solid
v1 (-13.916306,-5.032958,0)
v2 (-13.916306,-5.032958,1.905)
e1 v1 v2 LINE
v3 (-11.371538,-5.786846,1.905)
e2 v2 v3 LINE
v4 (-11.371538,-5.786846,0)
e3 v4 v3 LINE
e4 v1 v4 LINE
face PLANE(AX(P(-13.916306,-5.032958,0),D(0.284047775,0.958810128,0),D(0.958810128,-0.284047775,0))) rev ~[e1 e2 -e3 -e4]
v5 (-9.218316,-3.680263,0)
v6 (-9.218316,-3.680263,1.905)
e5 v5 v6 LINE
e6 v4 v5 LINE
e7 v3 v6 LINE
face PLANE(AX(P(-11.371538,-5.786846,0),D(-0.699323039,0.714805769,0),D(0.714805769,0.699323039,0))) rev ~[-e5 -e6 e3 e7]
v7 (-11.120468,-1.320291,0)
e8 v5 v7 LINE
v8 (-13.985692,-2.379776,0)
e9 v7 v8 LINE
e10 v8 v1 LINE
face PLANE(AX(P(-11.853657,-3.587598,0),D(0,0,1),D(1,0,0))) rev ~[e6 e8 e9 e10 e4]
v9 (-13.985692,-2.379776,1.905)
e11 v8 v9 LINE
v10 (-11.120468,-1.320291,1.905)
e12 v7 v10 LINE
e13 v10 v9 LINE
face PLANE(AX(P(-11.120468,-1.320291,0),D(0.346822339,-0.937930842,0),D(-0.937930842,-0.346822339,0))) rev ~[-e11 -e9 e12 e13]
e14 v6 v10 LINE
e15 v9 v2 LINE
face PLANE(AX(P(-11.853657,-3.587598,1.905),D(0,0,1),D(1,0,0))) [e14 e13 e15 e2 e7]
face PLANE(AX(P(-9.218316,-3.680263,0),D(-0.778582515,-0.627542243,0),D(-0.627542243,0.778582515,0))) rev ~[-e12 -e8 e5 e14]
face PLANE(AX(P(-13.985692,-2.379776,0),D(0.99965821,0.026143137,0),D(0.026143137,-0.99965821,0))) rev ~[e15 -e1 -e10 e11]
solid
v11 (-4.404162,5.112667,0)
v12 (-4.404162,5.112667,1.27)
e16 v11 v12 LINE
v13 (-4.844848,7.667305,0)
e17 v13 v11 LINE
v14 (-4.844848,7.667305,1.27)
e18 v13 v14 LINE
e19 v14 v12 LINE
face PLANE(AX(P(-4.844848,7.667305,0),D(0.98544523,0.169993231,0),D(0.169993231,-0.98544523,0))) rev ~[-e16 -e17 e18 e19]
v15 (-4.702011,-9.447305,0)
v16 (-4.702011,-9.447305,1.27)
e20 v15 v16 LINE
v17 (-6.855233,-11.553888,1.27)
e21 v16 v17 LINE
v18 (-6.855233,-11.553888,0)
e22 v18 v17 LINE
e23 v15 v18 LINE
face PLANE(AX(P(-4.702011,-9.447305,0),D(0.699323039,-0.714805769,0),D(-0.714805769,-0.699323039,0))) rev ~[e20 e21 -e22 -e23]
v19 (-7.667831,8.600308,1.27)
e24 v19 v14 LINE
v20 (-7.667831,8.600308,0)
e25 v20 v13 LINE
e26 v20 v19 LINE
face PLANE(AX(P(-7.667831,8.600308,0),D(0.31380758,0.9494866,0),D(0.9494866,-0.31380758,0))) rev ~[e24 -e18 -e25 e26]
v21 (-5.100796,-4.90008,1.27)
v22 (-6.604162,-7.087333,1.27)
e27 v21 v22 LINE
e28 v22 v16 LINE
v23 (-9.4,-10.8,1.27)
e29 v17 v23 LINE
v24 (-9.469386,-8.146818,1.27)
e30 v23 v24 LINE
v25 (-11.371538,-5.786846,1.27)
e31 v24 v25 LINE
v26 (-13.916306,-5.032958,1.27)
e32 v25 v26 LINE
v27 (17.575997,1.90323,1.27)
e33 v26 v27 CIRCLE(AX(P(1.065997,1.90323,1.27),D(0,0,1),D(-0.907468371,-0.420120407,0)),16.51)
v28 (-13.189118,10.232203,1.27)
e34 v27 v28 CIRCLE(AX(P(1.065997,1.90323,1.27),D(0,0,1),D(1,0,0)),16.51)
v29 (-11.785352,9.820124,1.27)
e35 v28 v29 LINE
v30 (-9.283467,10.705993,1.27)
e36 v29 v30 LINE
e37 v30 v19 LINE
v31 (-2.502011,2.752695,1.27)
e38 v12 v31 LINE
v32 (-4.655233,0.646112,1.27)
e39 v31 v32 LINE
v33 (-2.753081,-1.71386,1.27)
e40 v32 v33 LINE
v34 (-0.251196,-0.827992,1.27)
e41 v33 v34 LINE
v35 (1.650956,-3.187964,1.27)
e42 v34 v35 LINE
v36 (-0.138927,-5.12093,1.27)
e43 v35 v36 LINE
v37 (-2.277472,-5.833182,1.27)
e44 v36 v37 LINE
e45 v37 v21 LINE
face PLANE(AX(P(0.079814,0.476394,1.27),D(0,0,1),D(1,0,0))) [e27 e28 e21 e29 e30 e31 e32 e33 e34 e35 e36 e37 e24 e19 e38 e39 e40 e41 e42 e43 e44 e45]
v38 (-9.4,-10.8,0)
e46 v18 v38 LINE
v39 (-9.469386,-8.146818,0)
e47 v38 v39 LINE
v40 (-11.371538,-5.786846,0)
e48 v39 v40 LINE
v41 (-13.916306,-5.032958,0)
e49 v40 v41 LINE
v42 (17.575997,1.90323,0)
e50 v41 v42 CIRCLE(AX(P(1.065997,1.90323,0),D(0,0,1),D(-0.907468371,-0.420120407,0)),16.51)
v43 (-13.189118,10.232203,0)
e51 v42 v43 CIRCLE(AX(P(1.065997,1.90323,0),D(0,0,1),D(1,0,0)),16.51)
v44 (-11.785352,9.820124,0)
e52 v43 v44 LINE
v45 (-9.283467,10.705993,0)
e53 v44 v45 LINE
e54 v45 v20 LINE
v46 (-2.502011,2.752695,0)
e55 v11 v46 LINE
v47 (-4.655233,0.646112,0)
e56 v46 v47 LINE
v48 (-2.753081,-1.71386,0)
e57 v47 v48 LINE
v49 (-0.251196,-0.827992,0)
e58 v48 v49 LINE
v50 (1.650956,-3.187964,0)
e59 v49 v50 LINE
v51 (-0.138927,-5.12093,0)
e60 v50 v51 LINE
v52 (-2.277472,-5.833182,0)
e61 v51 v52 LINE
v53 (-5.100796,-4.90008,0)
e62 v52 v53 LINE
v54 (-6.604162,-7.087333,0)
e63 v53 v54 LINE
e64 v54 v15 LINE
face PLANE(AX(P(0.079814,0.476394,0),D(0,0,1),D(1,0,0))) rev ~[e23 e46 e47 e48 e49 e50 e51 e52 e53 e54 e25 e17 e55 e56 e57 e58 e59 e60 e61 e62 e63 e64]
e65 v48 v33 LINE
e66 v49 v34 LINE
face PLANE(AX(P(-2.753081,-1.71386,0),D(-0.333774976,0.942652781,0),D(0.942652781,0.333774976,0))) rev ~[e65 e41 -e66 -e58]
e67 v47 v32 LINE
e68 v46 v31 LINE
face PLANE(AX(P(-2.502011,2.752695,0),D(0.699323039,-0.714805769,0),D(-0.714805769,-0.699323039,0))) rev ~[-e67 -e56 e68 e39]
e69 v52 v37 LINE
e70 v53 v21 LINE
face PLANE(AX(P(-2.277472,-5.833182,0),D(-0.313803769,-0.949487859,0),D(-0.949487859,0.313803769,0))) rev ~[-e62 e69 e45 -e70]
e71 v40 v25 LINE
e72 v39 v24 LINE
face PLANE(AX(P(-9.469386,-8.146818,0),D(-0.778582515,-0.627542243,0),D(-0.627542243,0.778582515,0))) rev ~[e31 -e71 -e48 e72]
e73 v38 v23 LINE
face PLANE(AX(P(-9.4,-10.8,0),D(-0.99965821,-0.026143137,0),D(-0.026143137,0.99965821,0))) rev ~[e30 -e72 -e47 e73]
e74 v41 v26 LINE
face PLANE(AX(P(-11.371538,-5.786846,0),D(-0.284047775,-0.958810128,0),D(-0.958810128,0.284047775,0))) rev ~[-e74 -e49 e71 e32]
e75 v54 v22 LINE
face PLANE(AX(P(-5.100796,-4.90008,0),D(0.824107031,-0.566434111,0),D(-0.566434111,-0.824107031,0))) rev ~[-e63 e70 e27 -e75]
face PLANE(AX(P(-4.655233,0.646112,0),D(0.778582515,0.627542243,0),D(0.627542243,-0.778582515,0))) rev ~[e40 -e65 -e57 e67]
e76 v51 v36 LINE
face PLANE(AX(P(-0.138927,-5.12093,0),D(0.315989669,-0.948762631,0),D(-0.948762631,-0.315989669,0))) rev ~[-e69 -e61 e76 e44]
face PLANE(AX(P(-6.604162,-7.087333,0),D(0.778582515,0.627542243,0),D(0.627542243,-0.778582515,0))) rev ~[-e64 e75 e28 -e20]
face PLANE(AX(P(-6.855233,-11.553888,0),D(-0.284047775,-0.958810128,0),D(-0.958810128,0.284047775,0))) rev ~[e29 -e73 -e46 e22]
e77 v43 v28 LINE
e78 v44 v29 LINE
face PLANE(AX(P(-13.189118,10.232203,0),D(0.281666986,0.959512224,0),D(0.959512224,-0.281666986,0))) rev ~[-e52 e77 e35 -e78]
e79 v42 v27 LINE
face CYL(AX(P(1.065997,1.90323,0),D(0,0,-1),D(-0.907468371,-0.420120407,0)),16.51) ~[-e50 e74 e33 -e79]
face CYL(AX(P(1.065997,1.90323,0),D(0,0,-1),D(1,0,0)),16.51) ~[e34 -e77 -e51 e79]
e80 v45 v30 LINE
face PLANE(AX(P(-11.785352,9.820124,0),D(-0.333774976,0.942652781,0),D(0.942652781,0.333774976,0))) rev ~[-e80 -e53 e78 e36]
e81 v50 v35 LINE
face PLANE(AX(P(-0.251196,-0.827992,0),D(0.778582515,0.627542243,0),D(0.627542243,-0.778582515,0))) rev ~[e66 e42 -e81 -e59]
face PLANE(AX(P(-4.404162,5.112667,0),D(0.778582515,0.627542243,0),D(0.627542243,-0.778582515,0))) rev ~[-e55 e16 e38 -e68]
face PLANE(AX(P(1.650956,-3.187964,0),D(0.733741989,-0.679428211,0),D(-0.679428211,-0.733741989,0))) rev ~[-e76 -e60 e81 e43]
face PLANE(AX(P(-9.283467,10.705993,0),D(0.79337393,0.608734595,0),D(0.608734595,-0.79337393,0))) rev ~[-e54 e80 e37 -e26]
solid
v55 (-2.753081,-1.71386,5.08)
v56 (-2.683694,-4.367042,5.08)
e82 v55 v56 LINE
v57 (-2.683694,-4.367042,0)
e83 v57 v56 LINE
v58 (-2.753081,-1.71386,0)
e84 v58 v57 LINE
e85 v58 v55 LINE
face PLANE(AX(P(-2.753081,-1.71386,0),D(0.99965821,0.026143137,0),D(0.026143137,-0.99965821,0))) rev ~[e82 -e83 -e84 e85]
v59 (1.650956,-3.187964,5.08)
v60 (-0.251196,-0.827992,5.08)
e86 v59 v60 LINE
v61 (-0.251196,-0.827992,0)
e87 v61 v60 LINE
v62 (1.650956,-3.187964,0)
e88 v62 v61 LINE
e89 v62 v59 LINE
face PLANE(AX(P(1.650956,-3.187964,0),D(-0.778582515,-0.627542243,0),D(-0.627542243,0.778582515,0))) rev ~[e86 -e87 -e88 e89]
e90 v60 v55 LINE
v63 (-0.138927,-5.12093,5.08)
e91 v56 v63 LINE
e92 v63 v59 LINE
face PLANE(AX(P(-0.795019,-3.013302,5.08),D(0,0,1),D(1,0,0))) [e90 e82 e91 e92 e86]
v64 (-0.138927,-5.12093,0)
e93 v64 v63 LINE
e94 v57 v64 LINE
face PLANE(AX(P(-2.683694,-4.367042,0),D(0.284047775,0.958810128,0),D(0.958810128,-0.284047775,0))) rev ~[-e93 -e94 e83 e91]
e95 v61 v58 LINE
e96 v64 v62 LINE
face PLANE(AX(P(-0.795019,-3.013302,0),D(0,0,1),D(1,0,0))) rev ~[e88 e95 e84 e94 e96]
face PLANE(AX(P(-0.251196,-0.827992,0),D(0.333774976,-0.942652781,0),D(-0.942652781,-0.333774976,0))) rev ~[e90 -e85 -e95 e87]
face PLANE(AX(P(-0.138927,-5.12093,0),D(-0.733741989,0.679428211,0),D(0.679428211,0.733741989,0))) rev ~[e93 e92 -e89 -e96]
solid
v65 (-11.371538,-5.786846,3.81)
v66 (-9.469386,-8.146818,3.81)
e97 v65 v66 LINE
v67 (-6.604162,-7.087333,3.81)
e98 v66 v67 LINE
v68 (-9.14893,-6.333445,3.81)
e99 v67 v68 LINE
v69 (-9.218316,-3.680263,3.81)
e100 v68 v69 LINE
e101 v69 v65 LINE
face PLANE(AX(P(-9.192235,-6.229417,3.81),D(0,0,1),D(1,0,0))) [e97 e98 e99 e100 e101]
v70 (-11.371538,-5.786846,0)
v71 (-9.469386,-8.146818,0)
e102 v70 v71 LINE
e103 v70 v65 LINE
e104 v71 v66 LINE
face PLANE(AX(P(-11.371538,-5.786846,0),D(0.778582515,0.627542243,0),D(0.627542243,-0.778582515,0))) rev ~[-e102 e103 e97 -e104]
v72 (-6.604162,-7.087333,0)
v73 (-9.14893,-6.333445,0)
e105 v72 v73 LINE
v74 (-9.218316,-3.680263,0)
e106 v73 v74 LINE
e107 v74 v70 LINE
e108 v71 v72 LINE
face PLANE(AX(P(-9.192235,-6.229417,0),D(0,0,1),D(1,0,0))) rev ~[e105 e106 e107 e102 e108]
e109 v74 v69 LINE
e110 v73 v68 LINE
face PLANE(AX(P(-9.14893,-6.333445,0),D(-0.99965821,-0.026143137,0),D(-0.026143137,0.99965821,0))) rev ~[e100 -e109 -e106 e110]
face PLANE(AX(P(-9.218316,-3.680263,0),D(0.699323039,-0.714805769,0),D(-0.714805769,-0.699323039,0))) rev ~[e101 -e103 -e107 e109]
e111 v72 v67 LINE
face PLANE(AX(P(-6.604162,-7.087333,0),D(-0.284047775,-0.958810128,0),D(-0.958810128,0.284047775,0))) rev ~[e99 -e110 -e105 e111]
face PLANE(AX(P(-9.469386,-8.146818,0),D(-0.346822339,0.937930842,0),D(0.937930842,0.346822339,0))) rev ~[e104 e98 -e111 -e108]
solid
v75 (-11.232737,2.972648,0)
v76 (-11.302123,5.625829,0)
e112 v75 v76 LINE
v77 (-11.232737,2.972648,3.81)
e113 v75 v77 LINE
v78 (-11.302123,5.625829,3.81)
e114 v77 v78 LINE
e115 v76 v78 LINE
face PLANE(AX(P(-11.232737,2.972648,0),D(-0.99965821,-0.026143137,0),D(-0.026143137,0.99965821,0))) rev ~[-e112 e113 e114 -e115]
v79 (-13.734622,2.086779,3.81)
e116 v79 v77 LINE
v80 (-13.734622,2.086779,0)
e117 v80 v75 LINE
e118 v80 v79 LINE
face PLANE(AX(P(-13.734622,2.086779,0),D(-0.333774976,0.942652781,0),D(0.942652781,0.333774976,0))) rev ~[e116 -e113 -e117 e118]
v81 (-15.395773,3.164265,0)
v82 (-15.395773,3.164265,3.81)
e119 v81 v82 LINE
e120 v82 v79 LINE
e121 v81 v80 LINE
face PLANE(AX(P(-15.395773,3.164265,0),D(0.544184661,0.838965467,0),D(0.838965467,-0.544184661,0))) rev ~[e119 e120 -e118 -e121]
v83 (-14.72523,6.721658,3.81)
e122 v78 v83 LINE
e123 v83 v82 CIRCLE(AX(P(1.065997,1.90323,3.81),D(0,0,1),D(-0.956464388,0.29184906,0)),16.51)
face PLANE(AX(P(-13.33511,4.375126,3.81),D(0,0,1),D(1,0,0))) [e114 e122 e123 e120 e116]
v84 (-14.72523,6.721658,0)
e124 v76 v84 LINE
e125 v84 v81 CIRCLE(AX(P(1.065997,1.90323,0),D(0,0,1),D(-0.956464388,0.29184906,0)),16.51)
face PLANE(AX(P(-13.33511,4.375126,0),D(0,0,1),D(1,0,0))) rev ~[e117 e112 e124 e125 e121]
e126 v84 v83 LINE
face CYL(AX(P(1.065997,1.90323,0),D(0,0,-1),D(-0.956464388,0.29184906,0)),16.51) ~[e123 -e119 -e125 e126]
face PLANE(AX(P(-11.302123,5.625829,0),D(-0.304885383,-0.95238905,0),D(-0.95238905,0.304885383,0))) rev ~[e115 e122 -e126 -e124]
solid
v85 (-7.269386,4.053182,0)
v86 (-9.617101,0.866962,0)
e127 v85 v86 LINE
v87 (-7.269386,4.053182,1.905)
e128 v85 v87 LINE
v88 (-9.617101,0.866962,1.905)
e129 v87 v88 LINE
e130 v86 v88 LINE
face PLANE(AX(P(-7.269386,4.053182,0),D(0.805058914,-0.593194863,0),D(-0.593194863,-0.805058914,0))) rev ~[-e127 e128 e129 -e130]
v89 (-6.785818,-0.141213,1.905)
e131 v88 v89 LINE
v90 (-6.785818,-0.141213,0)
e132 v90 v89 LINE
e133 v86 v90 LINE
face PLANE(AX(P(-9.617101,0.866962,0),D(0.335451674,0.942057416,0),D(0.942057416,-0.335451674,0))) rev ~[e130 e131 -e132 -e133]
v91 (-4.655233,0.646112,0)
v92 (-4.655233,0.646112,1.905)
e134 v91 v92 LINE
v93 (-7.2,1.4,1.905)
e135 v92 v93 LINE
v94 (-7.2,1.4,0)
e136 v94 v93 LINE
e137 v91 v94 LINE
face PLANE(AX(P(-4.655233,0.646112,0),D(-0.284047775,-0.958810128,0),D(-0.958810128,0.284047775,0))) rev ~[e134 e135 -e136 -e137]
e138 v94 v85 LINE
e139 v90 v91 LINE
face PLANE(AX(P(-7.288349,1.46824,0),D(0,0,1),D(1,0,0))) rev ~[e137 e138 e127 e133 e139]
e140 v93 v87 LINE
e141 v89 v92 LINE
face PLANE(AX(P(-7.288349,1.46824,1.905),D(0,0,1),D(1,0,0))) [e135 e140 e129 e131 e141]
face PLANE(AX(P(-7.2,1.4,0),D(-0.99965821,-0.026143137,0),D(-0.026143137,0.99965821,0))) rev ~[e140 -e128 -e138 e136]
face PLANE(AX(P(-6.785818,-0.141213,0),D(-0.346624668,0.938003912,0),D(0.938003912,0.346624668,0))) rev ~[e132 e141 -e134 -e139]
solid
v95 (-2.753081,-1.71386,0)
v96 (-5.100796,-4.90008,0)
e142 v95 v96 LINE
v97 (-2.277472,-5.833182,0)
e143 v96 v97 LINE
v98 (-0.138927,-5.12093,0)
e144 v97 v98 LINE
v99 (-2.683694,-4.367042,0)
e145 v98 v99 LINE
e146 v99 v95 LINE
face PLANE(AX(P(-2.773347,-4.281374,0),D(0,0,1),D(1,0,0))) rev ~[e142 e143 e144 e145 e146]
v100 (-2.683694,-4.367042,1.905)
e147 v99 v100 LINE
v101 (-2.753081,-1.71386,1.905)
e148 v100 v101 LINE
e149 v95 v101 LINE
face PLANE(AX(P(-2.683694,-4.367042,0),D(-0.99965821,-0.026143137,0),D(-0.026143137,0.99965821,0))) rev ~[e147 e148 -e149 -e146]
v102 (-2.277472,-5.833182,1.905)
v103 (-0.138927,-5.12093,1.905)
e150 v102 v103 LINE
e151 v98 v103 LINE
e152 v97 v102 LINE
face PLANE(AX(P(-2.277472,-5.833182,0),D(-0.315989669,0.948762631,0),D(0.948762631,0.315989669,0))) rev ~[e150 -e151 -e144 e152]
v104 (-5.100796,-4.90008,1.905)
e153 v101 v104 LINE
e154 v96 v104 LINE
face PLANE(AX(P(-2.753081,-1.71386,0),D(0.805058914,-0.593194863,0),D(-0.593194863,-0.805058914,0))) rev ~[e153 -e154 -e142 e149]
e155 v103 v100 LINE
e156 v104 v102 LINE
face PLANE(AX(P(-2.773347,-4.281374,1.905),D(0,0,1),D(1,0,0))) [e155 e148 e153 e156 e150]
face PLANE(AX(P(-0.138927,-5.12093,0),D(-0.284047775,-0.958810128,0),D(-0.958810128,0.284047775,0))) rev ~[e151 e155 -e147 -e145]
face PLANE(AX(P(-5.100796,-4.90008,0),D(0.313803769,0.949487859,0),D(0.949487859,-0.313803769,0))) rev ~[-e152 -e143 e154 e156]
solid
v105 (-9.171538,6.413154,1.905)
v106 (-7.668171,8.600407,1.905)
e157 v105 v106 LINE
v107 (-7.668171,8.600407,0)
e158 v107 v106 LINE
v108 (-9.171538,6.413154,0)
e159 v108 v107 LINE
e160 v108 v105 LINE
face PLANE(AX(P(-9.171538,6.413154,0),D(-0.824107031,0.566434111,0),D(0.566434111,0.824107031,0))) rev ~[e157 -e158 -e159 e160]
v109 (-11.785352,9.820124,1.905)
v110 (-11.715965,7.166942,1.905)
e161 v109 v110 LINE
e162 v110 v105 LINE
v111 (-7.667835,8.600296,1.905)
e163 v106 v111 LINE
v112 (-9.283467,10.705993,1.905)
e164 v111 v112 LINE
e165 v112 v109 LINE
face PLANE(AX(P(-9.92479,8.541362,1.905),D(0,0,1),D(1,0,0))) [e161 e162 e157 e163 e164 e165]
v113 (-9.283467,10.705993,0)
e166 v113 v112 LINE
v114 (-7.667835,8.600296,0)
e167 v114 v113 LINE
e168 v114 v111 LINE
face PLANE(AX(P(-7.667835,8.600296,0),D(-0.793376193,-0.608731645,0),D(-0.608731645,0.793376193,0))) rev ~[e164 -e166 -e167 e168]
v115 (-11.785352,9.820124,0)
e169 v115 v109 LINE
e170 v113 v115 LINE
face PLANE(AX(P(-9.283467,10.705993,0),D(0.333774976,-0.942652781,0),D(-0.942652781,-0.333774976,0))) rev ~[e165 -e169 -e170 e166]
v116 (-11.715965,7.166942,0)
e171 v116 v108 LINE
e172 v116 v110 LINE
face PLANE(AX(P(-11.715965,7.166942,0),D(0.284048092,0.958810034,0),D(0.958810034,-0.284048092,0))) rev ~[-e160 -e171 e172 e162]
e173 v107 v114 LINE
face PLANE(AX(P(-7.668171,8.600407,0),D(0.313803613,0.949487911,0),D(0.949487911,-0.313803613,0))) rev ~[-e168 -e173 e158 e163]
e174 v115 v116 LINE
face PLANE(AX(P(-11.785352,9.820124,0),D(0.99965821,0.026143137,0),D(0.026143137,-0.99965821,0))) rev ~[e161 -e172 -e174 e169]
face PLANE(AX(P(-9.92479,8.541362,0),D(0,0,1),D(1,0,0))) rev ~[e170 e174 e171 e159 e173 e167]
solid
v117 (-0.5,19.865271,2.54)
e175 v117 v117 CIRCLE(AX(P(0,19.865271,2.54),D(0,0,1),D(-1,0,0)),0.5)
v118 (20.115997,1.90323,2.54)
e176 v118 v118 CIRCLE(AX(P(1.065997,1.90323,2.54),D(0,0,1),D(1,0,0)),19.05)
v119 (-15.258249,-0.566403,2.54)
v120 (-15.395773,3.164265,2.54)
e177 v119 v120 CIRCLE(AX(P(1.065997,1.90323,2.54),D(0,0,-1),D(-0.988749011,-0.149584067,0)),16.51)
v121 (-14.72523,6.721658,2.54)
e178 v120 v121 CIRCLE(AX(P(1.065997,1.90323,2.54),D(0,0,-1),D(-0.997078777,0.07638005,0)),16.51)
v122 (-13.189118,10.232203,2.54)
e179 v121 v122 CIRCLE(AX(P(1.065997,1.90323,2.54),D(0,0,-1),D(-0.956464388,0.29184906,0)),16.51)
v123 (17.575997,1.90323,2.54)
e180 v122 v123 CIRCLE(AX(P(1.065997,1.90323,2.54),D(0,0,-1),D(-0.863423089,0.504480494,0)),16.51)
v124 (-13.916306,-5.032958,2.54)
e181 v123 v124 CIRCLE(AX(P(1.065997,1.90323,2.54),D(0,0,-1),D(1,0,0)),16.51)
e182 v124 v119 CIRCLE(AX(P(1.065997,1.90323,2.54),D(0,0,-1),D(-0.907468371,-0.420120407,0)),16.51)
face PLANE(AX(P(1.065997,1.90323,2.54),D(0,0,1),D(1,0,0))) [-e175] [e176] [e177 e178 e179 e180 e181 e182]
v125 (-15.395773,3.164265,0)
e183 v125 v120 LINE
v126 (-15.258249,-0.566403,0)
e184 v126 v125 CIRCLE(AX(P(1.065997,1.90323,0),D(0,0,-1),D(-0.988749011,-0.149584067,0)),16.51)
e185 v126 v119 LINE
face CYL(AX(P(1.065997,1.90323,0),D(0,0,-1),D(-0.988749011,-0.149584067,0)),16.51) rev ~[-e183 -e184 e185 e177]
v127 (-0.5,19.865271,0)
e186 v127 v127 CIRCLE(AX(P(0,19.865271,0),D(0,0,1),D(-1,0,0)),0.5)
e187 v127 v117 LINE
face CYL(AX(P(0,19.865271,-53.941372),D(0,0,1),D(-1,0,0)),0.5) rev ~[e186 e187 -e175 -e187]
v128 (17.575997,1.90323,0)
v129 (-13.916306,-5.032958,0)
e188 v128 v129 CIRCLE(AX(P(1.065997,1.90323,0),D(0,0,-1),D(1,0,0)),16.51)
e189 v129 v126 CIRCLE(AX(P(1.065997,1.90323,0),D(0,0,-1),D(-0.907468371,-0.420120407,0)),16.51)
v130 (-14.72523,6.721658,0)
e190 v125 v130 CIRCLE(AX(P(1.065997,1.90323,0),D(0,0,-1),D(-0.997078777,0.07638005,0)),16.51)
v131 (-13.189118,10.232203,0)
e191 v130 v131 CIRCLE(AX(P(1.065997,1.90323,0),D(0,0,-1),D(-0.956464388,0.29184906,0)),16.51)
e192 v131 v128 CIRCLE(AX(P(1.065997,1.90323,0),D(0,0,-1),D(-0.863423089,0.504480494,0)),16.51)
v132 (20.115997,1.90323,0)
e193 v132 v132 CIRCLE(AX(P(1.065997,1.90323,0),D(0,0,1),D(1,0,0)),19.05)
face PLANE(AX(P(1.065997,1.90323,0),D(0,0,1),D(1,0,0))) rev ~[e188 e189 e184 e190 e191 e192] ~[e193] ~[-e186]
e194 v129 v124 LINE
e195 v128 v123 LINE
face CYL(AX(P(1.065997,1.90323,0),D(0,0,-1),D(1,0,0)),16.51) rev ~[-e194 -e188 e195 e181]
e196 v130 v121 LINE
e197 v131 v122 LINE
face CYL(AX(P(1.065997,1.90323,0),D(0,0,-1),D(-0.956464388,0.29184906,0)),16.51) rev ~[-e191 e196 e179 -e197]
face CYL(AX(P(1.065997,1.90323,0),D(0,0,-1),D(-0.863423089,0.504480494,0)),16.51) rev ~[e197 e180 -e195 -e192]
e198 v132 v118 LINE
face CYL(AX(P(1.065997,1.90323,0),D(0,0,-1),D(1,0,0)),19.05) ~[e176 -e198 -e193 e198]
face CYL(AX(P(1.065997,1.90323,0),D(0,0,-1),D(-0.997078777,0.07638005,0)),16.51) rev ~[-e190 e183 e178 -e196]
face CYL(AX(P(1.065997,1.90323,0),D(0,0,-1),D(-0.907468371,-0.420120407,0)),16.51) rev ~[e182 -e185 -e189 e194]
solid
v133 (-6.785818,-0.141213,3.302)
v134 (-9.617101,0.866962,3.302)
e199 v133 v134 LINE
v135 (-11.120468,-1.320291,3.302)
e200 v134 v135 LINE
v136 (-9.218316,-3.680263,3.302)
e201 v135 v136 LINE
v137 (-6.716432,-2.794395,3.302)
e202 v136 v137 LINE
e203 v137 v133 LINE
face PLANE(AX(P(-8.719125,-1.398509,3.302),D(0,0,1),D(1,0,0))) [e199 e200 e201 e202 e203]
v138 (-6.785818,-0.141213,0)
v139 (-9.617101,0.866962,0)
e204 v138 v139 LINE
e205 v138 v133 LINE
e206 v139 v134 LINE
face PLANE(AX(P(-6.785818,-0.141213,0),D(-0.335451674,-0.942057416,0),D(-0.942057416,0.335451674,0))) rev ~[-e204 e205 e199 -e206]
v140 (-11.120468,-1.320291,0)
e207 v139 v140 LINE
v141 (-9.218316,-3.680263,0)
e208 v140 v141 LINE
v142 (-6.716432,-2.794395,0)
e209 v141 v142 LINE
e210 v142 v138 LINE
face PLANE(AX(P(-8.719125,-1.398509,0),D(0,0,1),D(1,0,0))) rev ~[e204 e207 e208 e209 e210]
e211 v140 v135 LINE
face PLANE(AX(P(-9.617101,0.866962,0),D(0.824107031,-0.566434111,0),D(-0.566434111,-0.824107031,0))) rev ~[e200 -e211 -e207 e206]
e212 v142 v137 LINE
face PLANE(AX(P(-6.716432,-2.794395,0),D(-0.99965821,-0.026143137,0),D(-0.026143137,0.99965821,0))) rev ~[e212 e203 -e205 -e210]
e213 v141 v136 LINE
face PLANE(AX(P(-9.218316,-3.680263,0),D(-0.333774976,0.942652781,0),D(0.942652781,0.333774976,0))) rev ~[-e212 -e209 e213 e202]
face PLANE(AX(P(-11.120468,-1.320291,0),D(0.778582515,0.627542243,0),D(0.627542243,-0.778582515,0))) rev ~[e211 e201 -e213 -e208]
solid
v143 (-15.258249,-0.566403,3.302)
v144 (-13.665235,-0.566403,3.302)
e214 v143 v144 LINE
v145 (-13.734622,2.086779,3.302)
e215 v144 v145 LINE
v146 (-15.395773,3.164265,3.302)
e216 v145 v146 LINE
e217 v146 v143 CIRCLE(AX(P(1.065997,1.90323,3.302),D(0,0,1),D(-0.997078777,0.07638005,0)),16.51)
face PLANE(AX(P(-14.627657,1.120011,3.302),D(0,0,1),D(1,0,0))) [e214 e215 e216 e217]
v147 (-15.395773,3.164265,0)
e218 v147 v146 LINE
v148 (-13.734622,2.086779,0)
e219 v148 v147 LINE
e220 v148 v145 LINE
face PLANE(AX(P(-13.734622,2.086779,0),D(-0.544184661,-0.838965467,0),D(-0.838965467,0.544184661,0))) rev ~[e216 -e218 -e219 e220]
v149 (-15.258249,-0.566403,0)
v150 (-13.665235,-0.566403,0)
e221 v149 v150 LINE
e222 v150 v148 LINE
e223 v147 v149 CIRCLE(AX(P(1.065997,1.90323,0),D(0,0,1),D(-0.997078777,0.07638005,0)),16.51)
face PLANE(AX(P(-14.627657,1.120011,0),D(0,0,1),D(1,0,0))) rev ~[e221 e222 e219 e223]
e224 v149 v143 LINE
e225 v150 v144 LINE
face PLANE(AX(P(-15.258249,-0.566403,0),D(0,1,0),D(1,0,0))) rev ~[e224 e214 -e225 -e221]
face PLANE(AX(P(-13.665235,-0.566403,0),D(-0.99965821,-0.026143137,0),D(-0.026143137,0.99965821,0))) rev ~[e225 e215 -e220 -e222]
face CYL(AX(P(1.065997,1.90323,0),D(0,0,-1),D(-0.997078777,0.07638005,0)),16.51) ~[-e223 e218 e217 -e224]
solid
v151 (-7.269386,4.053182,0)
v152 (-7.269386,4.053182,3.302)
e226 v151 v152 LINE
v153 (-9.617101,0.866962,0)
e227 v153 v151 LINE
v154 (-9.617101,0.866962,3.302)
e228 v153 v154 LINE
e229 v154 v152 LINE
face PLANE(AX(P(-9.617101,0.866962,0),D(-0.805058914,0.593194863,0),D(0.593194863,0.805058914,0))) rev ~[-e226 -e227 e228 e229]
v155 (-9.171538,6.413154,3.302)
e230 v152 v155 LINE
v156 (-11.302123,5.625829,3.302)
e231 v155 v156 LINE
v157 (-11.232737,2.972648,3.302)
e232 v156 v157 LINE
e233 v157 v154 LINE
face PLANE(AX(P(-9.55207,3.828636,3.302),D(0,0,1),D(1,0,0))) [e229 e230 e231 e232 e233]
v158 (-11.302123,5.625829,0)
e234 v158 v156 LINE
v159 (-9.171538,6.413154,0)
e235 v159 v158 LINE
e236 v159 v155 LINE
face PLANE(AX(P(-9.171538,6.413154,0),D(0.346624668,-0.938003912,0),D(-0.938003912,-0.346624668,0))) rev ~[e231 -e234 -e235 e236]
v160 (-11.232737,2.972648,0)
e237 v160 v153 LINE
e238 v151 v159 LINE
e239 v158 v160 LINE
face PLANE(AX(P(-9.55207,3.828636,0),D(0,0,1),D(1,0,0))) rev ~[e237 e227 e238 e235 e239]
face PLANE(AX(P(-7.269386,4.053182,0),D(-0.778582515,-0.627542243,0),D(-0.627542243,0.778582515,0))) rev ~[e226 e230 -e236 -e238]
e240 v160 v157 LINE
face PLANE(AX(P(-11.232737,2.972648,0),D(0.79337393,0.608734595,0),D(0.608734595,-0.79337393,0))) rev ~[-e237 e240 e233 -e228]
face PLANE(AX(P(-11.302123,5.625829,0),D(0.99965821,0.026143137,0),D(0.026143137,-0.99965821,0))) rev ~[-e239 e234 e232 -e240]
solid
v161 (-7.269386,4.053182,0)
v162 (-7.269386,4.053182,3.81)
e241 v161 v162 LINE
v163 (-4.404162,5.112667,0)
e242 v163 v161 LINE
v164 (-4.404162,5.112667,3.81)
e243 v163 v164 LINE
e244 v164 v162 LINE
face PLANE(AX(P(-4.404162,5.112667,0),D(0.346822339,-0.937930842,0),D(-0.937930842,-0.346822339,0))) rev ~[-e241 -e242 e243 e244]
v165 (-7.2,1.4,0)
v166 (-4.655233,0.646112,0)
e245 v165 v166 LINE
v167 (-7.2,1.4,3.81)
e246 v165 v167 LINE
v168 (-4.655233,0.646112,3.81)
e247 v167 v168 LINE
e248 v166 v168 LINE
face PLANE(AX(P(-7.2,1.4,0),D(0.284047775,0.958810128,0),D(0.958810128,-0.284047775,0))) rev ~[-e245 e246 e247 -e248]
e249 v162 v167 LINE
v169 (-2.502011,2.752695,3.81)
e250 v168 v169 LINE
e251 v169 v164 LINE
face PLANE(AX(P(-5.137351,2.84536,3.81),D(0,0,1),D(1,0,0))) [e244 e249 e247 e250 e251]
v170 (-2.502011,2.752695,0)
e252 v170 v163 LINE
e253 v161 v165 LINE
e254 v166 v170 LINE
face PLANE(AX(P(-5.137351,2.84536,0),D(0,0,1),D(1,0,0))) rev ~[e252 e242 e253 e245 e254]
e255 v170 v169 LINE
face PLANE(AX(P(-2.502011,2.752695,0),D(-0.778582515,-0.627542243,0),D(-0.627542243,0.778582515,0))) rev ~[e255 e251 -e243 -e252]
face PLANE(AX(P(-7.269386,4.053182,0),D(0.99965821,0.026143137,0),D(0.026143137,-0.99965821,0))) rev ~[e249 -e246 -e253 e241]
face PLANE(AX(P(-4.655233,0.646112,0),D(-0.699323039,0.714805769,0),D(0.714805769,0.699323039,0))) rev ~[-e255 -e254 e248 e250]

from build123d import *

# Parameters (mm, degrees)
F0_R     = 19.05
F1_DEPTH = 2.54
F2_DEPTH = 3.81
F3_DEPTH = 1.905
F4_DEPTH = 1.27
F5_DEPTH = 5.08
F6_DEPTH = 3.302
F8_D     = 1


# Not quite as in the source:
# - ends of sketch curves that miss each other by under 0.0002 mm in the source are joined


with BuildPart() as f1:
    # F0 (on Top) → F1 (new body)
    with BuildSketch(Plane.XY):
        with Locations((1.0659972724, 1.9032299986)):
            Circle(F0_R)
        with BuildLine():
            ThreePointArc((-13.1891179301, 10.2322029584), (5.3804003601, 17.8395415542), (17.5759972724, 1.9032299986))
            ThreePointArc((17.5759972724, 1.9032299986), (4.617214022, -14.2203229472), (-13.9163055256, -5.032957922))
            ThreePointArc((-13.9163055256, -5.032957922), (-14.7457872718, -2.8473036059), (-15.2582489012, -0.5664029427))
            ThreePointArc((-15.2582489012, -0.5664029427), (-15.4327964499, 1.2950312559), (-15.3957733388, 3.1642646312))
            ThreePointArc((-15.3957733388, 3.1642646312), (-15.1582970549, 4.9613950667), (-14.7252297792, 6.7216579795))
            ThreePointArc((-14.7252297792, 6.7216579795), (-14.0593672595, 8.5216473152), (-13.1891179301, 10.2322029584))
        make_face(mode=Mode.SUBTRACT)
    extrude(amount=F1_DEPTH)

    # F8 (through all)
    with Locations(Plane(origin=(0, 0, 0), x_dir=(1, 0, 0), z_dir=(0, 0, -1))):
        with Locations((0, -19.865270704)):
            Hole(F8_D / 2)


with BuildPart() as f2:
    # F0 (on Top) → F2 (new body)
    with BuildSketch(Plane.XY):
        Polygon((-4.4041624778, 5.1126668811), (-7.2693862148, 4.0531819443), (-7.2, 1.4), (-4.6552325034, 0.6461119018), (-2.5020106636, 2.7526948456), align=None)
    extrude(amount=F2_DEPTH)


with BuildPart() as f2b:
    # F0 (on Top) → F2, piece 2 (new body)
    with BuildSketch(Plane.XY):
        with BuildLine():
            Line((-11.3021234722, 5.6258294676), (-14.7252297792, 6.7216579795))
            ThreePointArc((-14.7252297792, 6.7216579795), (-15.1582970549, 4.9613950667), (-15.3957733388, 3.1642646312))
            Line((-15.3957733388, 3.1642646312), (-13.7346217148, 2.0867790016))
            Line((-13.7346217148, 2.0867790016), (-11.2327372573, 2.9726475233))
            Line((-11.2327372573, 2.9726475233), (-11.3021234722, 5.6258294676))
        make_face()
    extrude(amount=F2_DEPTH)


with BuildPart() as f2c:
    # F0 (on Top) → F2, piece 3 (new body)
    with BuildSketch(Plane.XY):
        Polygon((-9.2183161892, -3.6802630764), (-11.371538029, -5.7868460202), (-9.4693862148, -8.1468180557), (-6.6041624778, -7.0873331189), (-9.1489299744, -6.3334450207), align=None)
    extrude(amount=F2_DEPTH)


with BuildPart() as f3:
    # F0 (on Top) → F3 (new body)
    with BuildSketch(Plane.XY):
        Polygon((-7.2693862148, 4.0531819443), (-9.6171014119, 0.866962435), (-6.7858179466, -0.1412126104), (-4.6552325034, 0.6461119018), (-7.2, 1.4), align=None)
    extrude(amount=F3_DEPTH)


with BuildPart() as f3b:
    # F0 (on Top) → F3, piece 2 (new body)
    with BuildSketch(Plane.XY):
        Polygon((-13.9856917404, -2.3797759777), (-13.9163055256, -5.032957922), (-11.371538029, -5.7868460202), (-9.2183161892, -3.6802630764), (-11.1204680034, -1.3202910409), align=None)
    extrude(amount=F3_DEPTH)


with BuildPart() as f3c:
    # F0 (on Top) → F3, piece 3 (new body)
    with BuildSketch(Plane.XY):
        Polygon((-9.2834670883, 10.7059926791), (-11.7853515458, 9.8201241574), (-11.7159653309, 7.1669422131), (-9.171538029, 6.4131539798), (-7.6681714375, 8.6004074557), (-7.6678349877, 8.6002962598), align=None)
    extrude(amount=F3_DEPTH)


with BuildPart() as f3d:
    # F0 (on Top) → F3, piece 4 (new body)
    with BuildSketch(Plane.XY):
        Polygon((-2.7530806892, -1.7138601337), (-5.1007958863, -4.900079643), (-2.2774721557, -5.8331822828), (-0.1389269778, -5.1209301762), (-2.6836944744, -4.367042078), align=None)
    extrude(amount=F3_DEPTH)


with BuildPart() as f4:
    # F0 (on Top) → F4 (new body)
    with BuildSketch(Plane.XY):
        with BuildLine():
            ThreePointArc((-13.9163055256, -5.032957922), (4.617214022, -14.2203229472), (17.5759972724, 1.9032299986))
            ThreePointArc((17.5759972724, 1.9032299986), (5.3804003601, 17.8395415542), (-13.1891179301, 10.2322029584))
            Line((-13.1891179301, 10.2322029584), (-11.7853515458, 9.8201241574))
            Line((-11.7853515458, 9.8201241574), (-9.2834670883, 10.7059926791))
            Line((-9.2834670883, 10.7059926791), (-7.6678312428, 8.6003075908))
            Line((-7.6678312428, 8.6003075908), (-4.8448477069, 7.6673048159))
            Line((-4.8448477069, 7.6673048159), (-4.4041624778, 5.1126668811))
            Line((-4.4041624778, 5.1126668811), (-2.5020106636, 2.7526948456))
            Line((-2.5020106636, 2.7526948456), (-4.6552325034, 0.6461119018))
            Line((-4.6552325034, 0.6461119018), (-2.7530806892, -1.7138601337))
            Line((-2.7530806892, -1.7138601337), (-0.2511962318, -0.827991612))
            Line((-0.2511962318, -0.827991612), (1.6509555824, -3.1879636476))
            Line((1.6509555824, -3.1879636476), (-0.1389269778, -5.1209301762))
            Line((-0.1389269778, -5.1209301762), (-2.2774721557, -5.8331822828))
            Line((-2.2774721557, -5.8331822828), (-5.1007958863, -4.900079643))
            Line((-5.1007958863, -4.900079643), (-6.6041624778, -7.0873331189))
            Line((-6.6041624778, -7.0873331189), (-4.7020106636, -9.4473051544))
            Line((-4.7020106636, -9.4473051544), (-6.8552325034, -11.5538880982))
            Line((-6.8552325034, -11.5538880982), (-9.4, -10.8))
            Line((-9.4, -10.8), (-9.4693862148, -8.1468180557))
            Line((-9.4693862148, -8.1468180557), (-11.371538029, -5.7868460202))
            Line((-11.371538029, -5.7868460202), (-13.9163055256, -5.032957922))
        make_face()
    extrude(amount=F4_DEPTH)


with BuildPart() as f5:
    # F0 (on Top) → F5 (new body)
    with BuildSketch(Plane.XY):
        Polygon((-0.2511962318, -0.827991612), (-2.7530806892, -1.7138601337), (-2.6836944744, -4.367042078), (-0.1389269778, -5.1209301762), (1.6509555824, -3.1879636476), align=None)
    extrude(amount=F5_DEPTH)


with BuildPart() as f6:
    # F0 (on Top) → F6 (new body)
    with BuildSketch(Plane.XY):
        Polygon((-9.171538029, 6.4131539798), (-11.3021234722, 5.6258294676), (-11.2327372573, 2.9726475233), (-9.6171014119, 0.866962435), (-7.2693862148, 4.0531819443), align=None)
    extrude(amount=F6_DEPTH)


with BuildPart() as f6b:
    # F0 (on Top) → F6, piece 2 (new body)
    with BuildSketch(Plane.XY):
        Polygon((-11.1204680034, -1.3202910409), (-9.2183161892, -3.6802630764), (-6.7164317317, -2.7943945547), (-6.7858179466, -0.1412126104), (-9.6171014119, 0.866962435), align=None)
    extrude(amount=F6_DEPTH)


with BuildPart() as f6c:
    # F0 (on Top) → F6, piece 3 (new body)
    with BuildSketch(Plane.XY):
        with BuildLine():
            ThreePointArc((-15.3957733388, 3.1642646312), (-15.4327964499, 1.2950312559), (-15.2582489012, -0.5664029427))
            Line((-15.2582489012, -0.5664029427), (-13.6652355, -0.5664029427))
            Line((-13.6652355, -0.5664029427), (-13.7346217148, 2.0867790016))
            Line((-13.7346217148, 2.0867790016), (-15.3957733388, 3.1642646312))
        make_face()
    extrude(amount=F6_DEPTH)


solid = Compound([f1.part, f2.part, f2b.part, f2c.part, f3.part, f3b.part, f3c.part, f3d.part, f4.part, f5.part, f6.part, f6b.part, f6c.part])
